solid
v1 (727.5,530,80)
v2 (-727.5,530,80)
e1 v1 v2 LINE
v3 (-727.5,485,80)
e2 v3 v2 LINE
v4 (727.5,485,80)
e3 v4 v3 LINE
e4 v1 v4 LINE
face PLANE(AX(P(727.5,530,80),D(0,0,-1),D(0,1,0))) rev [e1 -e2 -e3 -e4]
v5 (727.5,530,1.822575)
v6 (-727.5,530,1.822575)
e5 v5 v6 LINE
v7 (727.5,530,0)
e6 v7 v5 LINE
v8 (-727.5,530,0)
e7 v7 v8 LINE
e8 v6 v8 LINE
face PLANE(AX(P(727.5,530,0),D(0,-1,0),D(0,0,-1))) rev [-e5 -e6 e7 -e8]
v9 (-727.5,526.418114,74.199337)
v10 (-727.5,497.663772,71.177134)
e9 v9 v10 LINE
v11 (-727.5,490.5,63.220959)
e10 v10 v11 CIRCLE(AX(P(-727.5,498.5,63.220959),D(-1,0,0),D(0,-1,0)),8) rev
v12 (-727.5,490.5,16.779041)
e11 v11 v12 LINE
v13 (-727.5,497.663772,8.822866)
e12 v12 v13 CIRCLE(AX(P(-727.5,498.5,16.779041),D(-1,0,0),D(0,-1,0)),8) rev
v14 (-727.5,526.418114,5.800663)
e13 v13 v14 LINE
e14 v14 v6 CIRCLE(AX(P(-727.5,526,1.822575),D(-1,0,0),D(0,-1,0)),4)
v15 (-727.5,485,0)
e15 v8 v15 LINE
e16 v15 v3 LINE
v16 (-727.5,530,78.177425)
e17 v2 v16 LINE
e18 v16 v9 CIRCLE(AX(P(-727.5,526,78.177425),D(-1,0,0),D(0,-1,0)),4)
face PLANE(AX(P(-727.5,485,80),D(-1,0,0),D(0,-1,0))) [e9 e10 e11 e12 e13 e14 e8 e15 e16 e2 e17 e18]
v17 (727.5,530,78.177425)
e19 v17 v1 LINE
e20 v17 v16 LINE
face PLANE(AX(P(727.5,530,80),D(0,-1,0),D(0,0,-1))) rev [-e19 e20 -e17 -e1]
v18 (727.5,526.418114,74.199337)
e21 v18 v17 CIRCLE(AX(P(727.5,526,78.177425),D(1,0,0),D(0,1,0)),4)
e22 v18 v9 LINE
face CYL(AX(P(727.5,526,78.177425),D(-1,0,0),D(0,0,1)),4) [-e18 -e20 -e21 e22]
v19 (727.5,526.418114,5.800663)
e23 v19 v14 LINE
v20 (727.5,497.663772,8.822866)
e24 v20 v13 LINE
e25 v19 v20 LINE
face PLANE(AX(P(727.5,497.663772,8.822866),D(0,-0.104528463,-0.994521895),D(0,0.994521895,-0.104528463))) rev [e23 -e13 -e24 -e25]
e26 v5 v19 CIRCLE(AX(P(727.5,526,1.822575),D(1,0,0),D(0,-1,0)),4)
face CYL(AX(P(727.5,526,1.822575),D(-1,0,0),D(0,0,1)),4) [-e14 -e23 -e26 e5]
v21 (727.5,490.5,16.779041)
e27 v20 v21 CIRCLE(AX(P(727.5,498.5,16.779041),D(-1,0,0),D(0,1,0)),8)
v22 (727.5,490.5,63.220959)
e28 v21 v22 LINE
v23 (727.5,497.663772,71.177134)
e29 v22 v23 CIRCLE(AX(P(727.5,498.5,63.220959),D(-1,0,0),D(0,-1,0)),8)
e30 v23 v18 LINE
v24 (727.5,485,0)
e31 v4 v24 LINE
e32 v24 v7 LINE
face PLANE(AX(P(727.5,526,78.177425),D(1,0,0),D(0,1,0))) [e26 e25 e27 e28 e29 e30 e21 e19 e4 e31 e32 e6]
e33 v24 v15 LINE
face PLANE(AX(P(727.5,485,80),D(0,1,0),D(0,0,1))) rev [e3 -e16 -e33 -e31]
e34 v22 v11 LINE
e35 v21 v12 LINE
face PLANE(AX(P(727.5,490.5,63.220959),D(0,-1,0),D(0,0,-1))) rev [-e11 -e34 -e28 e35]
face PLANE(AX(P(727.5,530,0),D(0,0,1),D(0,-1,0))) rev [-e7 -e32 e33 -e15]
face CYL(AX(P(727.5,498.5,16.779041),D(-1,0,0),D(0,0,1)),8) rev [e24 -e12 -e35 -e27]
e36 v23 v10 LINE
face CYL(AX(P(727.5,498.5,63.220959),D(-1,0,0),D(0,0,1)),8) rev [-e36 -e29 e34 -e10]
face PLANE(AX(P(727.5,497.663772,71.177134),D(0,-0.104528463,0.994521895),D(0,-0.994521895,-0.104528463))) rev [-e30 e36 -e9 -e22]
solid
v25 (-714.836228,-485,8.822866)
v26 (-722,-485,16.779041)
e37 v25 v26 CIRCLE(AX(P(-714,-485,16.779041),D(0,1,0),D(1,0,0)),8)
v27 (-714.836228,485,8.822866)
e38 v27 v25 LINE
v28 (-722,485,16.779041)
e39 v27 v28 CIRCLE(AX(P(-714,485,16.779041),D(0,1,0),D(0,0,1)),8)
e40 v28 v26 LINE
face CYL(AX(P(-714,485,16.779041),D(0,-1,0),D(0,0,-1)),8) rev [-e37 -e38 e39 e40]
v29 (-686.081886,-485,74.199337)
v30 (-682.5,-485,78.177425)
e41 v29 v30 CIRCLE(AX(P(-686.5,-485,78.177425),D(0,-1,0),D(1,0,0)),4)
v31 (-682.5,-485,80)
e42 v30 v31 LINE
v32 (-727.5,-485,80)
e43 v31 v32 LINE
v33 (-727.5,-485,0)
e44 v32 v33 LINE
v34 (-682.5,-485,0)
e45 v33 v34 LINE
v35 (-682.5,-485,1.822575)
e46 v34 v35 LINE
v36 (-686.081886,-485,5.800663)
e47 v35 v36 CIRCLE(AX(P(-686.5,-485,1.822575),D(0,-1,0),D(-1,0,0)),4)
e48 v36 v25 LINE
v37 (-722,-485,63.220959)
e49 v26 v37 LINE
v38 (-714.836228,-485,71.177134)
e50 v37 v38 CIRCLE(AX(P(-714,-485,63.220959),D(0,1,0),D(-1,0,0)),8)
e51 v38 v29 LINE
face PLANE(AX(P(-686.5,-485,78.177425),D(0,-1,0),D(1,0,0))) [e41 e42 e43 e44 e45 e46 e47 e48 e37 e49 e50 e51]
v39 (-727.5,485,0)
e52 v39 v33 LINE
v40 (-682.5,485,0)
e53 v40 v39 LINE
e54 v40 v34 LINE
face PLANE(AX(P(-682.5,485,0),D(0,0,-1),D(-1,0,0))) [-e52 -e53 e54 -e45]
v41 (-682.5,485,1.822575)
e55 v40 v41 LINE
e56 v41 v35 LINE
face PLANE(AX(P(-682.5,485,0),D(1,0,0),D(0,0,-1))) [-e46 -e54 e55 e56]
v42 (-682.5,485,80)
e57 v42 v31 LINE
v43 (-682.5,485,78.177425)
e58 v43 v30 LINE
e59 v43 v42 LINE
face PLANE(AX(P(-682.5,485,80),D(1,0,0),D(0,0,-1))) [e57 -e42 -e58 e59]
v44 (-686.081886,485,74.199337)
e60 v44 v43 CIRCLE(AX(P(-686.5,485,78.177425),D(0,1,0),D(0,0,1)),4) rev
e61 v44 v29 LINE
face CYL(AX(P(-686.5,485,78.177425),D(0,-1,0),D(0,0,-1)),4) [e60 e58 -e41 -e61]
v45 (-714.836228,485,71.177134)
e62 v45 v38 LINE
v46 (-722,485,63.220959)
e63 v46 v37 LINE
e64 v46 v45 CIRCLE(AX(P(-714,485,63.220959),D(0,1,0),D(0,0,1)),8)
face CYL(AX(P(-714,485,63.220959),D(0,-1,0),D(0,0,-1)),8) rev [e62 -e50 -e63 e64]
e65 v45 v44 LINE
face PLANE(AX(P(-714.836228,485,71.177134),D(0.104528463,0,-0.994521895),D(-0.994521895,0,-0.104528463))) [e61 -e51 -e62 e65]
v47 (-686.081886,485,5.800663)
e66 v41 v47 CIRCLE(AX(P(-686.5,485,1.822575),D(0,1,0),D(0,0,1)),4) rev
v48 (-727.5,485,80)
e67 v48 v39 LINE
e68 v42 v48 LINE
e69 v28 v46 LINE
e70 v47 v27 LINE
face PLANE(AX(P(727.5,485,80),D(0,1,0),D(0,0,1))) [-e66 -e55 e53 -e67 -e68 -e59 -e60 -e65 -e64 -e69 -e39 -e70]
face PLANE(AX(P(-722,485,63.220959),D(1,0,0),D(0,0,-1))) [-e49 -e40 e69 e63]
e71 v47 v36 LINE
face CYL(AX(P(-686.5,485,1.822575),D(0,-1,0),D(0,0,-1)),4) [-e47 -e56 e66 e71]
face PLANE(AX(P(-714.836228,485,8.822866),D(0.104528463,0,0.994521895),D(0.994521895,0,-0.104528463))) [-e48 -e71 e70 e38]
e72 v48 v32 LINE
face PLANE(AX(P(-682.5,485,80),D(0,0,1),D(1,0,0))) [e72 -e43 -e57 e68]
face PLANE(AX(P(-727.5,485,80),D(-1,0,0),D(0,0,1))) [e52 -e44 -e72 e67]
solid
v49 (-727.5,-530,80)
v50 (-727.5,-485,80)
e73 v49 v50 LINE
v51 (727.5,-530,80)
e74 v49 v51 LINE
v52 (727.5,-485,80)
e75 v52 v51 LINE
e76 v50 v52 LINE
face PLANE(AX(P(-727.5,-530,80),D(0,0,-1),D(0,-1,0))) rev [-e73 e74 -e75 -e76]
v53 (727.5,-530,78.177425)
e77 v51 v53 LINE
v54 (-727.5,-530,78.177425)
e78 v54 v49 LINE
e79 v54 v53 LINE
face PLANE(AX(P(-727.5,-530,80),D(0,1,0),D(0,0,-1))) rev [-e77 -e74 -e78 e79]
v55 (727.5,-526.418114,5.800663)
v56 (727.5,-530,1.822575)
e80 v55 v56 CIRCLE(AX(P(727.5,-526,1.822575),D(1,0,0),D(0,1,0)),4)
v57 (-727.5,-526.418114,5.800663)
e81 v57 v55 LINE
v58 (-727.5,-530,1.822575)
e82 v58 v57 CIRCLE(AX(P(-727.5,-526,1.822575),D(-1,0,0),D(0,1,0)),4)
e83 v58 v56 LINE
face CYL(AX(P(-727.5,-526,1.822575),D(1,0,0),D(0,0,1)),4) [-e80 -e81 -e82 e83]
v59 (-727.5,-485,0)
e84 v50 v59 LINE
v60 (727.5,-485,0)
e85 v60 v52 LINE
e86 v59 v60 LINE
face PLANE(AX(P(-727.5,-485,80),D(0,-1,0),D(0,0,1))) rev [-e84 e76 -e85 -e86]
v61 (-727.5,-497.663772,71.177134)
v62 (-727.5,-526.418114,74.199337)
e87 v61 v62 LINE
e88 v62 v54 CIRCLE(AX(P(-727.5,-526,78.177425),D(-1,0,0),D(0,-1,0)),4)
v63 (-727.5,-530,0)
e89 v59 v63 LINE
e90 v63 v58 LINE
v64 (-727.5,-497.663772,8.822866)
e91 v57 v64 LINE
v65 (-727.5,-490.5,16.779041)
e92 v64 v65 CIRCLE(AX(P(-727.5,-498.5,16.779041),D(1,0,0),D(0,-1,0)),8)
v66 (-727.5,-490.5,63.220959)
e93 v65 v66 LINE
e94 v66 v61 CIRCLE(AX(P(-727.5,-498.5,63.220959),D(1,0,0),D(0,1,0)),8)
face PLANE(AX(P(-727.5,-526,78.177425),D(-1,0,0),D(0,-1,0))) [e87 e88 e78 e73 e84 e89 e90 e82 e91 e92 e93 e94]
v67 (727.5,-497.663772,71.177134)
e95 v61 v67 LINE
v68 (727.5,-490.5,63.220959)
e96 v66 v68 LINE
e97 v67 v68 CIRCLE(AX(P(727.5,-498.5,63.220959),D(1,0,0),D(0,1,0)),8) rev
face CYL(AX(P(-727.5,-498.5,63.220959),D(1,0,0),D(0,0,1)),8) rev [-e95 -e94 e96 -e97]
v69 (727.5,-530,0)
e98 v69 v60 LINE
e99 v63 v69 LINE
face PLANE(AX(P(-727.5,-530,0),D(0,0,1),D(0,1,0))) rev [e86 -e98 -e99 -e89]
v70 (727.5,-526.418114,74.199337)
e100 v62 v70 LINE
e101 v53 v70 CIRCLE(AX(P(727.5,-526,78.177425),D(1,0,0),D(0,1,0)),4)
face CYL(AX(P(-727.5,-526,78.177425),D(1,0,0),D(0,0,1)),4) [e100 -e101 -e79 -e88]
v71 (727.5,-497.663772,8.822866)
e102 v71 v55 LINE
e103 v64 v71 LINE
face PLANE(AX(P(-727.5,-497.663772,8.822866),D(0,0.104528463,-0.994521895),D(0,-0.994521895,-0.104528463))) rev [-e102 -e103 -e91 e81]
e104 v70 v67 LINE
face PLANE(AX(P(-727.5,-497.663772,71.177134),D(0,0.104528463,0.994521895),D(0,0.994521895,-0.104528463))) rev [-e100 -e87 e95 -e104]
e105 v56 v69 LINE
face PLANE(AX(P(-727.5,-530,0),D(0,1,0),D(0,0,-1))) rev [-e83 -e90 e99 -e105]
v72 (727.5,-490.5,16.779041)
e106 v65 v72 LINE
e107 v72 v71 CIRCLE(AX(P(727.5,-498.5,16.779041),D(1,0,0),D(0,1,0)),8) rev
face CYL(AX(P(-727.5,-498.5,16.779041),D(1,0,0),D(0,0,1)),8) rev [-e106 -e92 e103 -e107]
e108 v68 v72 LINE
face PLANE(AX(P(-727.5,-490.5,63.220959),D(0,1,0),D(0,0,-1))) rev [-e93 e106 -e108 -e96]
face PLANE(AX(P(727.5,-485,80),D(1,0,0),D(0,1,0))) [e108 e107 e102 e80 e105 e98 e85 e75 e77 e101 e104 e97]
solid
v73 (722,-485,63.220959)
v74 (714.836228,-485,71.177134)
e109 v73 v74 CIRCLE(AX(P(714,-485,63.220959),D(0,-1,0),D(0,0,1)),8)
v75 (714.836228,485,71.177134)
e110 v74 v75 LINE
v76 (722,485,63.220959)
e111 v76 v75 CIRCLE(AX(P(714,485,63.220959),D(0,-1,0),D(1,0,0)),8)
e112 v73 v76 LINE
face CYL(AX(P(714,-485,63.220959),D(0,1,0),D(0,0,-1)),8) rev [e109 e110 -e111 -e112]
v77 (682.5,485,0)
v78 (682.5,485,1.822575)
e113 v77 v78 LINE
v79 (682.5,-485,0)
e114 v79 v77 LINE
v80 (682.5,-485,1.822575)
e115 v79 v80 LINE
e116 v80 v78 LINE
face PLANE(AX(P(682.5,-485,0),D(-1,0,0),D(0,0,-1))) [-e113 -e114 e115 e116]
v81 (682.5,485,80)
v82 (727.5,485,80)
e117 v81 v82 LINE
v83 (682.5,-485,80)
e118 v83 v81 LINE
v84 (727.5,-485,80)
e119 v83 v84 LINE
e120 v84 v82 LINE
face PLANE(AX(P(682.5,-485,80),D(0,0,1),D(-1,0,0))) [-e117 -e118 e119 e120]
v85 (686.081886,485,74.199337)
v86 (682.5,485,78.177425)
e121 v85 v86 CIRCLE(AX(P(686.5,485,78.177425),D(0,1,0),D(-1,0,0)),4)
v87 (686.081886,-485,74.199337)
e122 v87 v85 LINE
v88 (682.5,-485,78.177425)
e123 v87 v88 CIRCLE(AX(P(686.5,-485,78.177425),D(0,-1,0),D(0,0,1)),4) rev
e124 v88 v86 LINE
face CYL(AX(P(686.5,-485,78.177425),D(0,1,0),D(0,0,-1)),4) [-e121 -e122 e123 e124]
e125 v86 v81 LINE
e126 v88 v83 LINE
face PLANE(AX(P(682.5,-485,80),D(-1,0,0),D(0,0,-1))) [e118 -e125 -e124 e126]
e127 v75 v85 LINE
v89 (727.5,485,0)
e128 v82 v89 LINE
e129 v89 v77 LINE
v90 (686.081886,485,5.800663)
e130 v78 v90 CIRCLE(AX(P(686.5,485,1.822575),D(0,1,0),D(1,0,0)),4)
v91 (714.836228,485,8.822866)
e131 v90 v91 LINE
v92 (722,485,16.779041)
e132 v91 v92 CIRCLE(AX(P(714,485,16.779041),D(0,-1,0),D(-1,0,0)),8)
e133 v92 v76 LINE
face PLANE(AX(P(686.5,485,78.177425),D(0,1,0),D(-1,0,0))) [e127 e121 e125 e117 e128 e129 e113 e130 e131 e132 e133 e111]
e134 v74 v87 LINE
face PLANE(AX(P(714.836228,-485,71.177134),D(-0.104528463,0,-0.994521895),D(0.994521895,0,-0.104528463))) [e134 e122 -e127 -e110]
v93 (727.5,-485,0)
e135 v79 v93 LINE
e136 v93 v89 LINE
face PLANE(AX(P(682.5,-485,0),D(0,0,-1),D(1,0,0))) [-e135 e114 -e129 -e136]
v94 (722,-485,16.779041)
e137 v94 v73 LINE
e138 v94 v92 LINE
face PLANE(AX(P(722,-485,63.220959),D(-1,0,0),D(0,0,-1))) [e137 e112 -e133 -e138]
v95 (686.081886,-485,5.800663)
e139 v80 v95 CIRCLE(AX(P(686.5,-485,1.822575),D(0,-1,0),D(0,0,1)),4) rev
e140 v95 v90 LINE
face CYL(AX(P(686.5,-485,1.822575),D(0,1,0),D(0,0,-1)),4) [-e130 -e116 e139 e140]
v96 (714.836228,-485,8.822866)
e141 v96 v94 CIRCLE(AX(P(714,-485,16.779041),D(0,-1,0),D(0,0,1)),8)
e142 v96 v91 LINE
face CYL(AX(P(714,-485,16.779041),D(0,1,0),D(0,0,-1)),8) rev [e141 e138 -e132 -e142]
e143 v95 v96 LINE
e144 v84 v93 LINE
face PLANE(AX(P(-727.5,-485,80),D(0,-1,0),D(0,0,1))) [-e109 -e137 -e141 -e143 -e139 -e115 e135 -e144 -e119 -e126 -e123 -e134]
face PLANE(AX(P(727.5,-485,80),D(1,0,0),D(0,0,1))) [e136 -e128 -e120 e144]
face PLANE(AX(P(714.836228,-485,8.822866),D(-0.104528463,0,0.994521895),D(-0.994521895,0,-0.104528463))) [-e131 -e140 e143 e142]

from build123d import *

# Parameters (mm, degrees)
C_START                               = -727.5
C_CHANNEL_CONFIGURED_80_X_8_1_DEPTH   = 1455
C_START_2                             = -485
C_CHANNEL_CONFIGURED_80_X_8_1_2_DEPTH = 970
CIRPATTERN1_COUNT                     = 2
CIRPATTERN1_ANGLE                     = 180


# Read off the part's stored shape, not the designer's step: C channel - configured 80 X 8(1)
with BuildPart() as part:
    # C channel - configured 80 X 8(1) outline → C channel - configured 80 X 8(1) (new body)
    with BuildSketch(Plane.YZ.offset(C_START)):
        with BuildLine():
            ThreePointArc((526.418113853, 74.199337243), (528.972579302, 75.500902399), (530, 78.177424825))
            Line((530, 78.177424825), (530, 80))
            Line((530, 80), (485, 80))
            Line((485, 80), (485, 0))
            Line((485, 0), (530, 0))
            Line((530, 0), (530, 1.822575175))
            ThreePointArc((530, 1.822575175), (528.972579302, 4.499097601), (526.418113853, 5.800662757))
            Line((526.418113853, 5.800662757), (497.663772294, 8.822865837))
            ThreePointArc((497.663772294, 8.822865837), (492.554841396, 11.425996149), (490.5, 16.779041))
            Line((490.5, 16.779041), (490.5, 63.220959))
            ThreePointArc((490.5, 63.220959), (492.554841396, 68.574003851), (497.663772294, 71.177134163))
            Line((497.663772294, 71.177134163), (526.418113853, 74.199337243))
        make_face()
    extrude(amount=C_CHANNEL_CONFIGURED_80_X_8_1_DEPTH)


with BuildPart() as body_2:
    # C channel - configured 80 X 8_1 2 outlin → C channel - configured 80 X 8_1 2 (new body)
    with BuildSketch(Plane(origin=(0, 0, 0), x_dir=(1, 0, 0), z_dir=(0, 1, 0)).offset(C_START_2)):
        with BuildLine():
            Line((-727.5, -80), (-682.5, -80))
            Line((-682.5, -80), (-682.5, -78.177424825))
            ThreePointArc((-682.5, -78.177424825), (-683.527420698, -75.500902399), (-686.081886147, -74.199337243))
            Line((-686.081886147, -74.199337243), (-714.836227706, -71.177134163))
            ThreePointArc((-714.836227706, -71.177134163), (-719.945158604, -68.574003851), (-722, -63.220959))
            Line((-722, -63.220959), (-722, -16.779041))
            ThreePointArc((-722, -16.779041), (-719.945158604, -11.425996149), (-714.836227706, -8.822865837))
            Line((-714.836227706, -8.822865837), (-686.081886147, -5.800662757))
            ThreePointArc((-686.081886147, -5.800662757), (-683.527420698, -4.499097601), (-682.5, -1.822575175))
            Line((-682.5, -1.822575175), (-682.5, 0))
            Line((-682.5, 0), (-727.5, 0))
            Line((-727.5, 0), (-727.5, -80))
        make_face()
    extrude(amount=C_CHANNEL_CONFIGURED_80_X_8_1_2_DEPTH)


with BuildPart() as cirpattern1_1:
    # CirPattern1: pattern copy
    add(part.part.rotate(Axis((0, 0, 0), (0, 0, 1)), 1 * CIRPATTERN1_ANGLE / (CIRPATTERN1_COUNT - 1)))


with BuildPart() as cirpattern1_2:
    # CirPattern1: pattern copy
    add(body_2.part.rotate(Axis((0, 0, 0), (0, 0, 1)), 1 * CIRPATTERN1_ANGLE / (CIRPATTERN1_COUNT - 1)))


solid = Compound([part.part, body_2.part, cirpattern1_1.part, cirpattern1_2.part])
